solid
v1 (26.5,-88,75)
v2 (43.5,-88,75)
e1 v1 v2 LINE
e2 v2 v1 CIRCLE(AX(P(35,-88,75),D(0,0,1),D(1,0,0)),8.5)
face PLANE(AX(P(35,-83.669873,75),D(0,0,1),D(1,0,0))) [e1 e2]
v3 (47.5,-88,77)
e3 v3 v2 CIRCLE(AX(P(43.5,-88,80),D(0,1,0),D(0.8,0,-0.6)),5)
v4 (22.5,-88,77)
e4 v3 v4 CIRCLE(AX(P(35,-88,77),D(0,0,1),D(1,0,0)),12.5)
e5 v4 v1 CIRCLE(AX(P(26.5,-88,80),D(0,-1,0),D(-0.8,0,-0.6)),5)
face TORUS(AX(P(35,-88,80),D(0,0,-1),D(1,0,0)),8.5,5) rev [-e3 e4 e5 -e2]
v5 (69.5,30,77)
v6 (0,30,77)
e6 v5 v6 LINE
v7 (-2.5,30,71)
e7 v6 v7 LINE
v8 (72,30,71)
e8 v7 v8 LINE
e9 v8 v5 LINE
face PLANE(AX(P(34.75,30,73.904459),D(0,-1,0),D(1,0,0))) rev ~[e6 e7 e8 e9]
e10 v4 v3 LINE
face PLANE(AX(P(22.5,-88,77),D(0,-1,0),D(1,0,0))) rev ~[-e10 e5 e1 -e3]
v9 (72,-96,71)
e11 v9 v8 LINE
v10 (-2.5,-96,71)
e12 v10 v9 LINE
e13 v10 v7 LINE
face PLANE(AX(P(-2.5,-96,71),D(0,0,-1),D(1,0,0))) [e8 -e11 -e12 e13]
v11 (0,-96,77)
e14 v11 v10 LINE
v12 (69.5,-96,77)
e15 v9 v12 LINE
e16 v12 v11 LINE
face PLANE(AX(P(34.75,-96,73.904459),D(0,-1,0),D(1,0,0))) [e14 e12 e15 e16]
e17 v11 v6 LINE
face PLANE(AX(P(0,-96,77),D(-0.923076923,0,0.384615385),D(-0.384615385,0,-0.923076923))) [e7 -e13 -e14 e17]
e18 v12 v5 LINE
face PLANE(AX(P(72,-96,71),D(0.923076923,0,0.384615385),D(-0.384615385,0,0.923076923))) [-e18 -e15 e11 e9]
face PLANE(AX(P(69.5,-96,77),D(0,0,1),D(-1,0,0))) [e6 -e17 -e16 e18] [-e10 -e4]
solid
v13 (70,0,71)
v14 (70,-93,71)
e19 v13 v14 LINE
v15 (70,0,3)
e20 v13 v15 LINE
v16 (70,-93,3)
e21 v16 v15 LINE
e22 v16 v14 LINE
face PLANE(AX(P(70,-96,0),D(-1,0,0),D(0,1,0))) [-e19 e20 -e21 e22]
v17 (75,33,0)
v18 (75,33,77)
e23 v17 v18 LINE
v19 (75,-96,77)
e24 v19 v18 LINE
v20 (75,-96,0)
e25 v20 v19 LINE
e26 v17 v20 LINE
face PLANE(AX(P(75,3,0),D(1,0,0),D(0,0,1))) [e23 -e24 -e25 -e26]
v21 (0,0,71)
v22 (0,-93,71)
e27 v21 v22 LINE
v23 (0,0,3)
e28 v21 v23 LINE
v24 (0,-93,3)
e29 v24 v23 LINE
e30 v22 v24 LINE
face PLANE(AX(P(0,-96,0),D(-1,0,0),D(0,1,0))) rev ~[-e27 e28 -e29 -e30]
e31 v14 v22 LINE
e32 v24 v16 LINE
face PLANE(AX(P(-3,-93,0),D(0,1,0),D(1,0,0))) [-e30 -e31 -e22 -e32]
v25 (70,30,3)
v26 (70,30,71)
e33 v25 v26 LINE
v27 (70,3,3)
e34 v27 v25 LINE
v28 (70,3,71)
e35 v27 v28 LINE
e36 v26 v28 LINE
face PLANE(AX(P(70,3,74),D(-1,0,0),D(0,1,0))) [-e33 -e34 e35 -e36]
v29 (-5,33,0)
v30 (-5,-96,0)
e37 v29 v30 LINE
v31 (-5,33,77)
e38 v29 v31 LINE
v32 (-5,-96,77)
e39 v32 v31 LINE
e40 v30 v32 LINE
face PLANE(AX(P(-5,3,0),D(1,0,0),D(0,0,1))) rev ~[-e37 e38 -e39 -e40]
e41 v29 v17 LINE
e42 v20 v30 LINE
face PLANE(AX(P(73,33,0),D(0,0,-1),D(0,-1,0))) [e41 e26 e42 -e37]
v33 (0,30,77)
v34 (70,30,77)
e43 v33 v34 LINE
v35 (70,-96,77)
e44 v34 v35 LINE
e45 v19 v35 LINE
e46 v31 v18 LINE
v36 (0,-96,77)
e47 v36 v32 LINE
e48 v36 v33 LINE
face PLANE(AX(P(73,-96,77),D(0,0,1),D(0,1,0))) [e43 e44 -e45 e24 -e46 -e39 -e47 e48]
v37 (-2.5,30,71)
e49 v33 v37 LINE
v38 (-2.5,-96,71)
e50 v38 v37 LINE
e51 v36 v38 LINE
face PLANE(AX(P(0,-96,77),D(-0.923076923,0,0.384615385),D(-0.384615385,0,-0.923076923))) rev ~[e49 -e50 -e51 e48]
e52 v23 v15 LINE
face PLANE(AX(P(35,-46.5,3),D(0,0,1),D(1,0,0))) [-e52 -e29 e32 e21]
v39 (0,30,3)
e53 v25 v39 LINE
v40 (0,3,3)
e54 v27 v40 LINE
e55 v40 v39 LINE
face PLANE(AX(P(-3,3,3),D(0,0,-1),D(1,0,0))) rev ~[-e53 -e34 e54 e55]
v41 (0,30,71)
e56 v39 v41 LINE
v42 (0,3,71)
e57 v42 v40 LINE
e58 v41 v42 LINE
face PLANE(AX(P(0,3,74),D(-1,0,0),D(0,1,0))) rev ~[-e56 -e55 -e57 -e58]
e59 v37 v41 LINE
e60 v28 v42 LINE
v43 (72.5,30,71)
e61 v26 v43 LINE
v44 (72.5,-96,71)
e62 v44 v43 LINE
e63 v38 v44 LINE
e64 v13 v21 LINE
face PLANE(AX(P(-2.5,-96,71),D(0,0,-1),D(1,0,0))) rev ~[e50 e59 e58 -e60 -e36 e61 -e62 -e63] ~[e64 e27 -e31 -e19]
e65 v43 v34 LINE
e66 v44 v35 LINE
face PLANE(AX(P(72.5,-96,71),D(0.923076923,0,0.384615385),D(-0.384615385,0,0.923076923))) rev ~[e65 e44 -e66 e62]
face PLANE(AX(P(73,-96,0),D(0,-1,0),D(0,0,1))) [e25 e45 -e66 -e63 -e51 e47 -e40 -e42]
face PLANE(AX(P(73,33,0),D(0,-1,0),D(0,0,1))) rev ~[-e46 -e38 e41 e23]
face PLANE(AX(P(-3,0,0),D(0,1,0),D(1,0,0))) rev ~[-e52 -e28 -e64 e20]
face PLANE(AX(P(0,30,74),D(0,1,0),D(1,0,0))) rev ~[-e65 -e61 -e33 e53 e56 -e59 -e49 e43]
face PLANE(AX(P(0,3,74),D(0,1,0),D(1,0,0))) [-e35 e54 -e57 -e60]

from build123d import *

# Parameters (mm, degrees)
F0_W         = 76
F0_H         = 99
F0_W_2       = 70
F0_H_2       = 93
F1_DEPTH     = 77
F2_T         = -3
F3_DEPTH     = 30
F4_T         = -3
F5_DEPTH     = 2
F6_DEPTH     = 2
F8_DEPTH     = 126
F10_DEPTH    = 126
F12_DEPTH    = 2
F13_T2_ANGLE = 180


# Not quite as in the source:
# - a fillet or chamfer that OpenCascade refuses, or shapes differently, is made with other operations: its cross-section is extruded or revolved along the edge and cut away or added


with BuildPart() as f1:
    # F0 (on Top) → F1 (new body)
    with BuildSketch(Plane.XY):
        with Locations((35, -46.5)):
            Rectangle(F0_W, F0_H)
        with Locations((35, -46.5)):
            Rectangle(F0_W_2, F0_H_2, mode=Mode.SUBTRACT)
        with Locations((35, -46.5)):
            Rectangle(F0_W_2, F0_H_2)
    extrude(amount=F1_DEPTH)

    # F2
    f2_openings = [f1.faces().sort_by_distance(p)[0] for p in [
        (35, -46.5, 77),
    ]]
    offset(amount=F2_T, openings=f2_openings)

    # F3 (add): a face of the model
    f3_faces = [f1.faces().sort_by_distance(p)[0] for p in [
        (35, 3, 38.5),
    ]]
    extrude(f3_faces, amount=F3_DEPTH)

    # F4: a shell. OpenCascade refuses it in one call, so the cavity is built on its own and cut out:
    # the body offset inwards by the wall thickness, plus a prism from it out through each open face.
    f4_core = offset(f1.part, amount=F4_T, kind=Kind.INTERSECTION, mode=Mode.PRIVATE)
    f4_exits = [f4_core.faces().sort_by_distance(p)[0] for p in [
        (35, 16.5, 74),
    ]]
    add(f4_core, mode=Mode.SUBTRACT)
    extrude(f4_exits, amount=-F4_T, mode=Mode.SUBTRACT)

    # F5 (add): a face of the model
    f5_faces = [f1.faces().sort_by_distance(p)[0] for p in [
        (-3, -31.5, 38.5),
    ]]
    extrude(f5_faces, amount=F5_DEPTH)

    # F6 (add): a face of the model
    f6_faces = [f1.faces().sort_by_distance(p)[0] for p in [
        (73, -31.5, 38.5),
    ]]
    extrude(f6_faces, amount=F6_DEPTH)

    # F7 (on face) → F8 (cut, through all)
    with BuildSketch(Plane.XZ.offset(96)):
        Polygon((70, 77), (0, 77), (-2.5, 71), (72.5, 71), align=None)
    extrude(amount=-F8_DEPTH, mode=Mode.SUBTRACT)


with BuildPart() as f10:
    # F9 (on face) → F10 (new body, through all)
    with BuildSketch(Plane.XZ.offset(96)):
        Polygon((69.5, 77), (0, 77), (-2.5, 71), (72, 71), align=None)
    extrude(amount=-F10_DEPTH)

    # F11 (on face) → F12 (cut)
    with BuildSketch(Plane.XY.offset(77)):
        with BuildLine():
            Line((22.5, -88), (47.5, -88))
            ThreePointArc((47.5, -88), (35, -75.5), (22.5, -88))
        make_face()
    extrude(amount=-F12_DEPTH, mode=Mode.SUBTRACT)

    # F13: fillet of radius 5 on 1 edges, made by hand

    # F13_s1 → F13_t2 (revolve)
    with BuildSketch(Plane.XZ.offset(88)):
        with BuildLine():
            ThreePointArc((47.5, 77), (45.7360679775, 75.527864045), (43.5, 75))
            Line((43.5, 75), (47.5, 75))
            Line((47.5, 75), (47.5, 77))
        make_face()
    revolve(axis=Axis((35, -88, 75), (0, 0, 1)), revolution_arc=F13_T2_ANGLE)


solid = Compound([f1.part, f10.part])
